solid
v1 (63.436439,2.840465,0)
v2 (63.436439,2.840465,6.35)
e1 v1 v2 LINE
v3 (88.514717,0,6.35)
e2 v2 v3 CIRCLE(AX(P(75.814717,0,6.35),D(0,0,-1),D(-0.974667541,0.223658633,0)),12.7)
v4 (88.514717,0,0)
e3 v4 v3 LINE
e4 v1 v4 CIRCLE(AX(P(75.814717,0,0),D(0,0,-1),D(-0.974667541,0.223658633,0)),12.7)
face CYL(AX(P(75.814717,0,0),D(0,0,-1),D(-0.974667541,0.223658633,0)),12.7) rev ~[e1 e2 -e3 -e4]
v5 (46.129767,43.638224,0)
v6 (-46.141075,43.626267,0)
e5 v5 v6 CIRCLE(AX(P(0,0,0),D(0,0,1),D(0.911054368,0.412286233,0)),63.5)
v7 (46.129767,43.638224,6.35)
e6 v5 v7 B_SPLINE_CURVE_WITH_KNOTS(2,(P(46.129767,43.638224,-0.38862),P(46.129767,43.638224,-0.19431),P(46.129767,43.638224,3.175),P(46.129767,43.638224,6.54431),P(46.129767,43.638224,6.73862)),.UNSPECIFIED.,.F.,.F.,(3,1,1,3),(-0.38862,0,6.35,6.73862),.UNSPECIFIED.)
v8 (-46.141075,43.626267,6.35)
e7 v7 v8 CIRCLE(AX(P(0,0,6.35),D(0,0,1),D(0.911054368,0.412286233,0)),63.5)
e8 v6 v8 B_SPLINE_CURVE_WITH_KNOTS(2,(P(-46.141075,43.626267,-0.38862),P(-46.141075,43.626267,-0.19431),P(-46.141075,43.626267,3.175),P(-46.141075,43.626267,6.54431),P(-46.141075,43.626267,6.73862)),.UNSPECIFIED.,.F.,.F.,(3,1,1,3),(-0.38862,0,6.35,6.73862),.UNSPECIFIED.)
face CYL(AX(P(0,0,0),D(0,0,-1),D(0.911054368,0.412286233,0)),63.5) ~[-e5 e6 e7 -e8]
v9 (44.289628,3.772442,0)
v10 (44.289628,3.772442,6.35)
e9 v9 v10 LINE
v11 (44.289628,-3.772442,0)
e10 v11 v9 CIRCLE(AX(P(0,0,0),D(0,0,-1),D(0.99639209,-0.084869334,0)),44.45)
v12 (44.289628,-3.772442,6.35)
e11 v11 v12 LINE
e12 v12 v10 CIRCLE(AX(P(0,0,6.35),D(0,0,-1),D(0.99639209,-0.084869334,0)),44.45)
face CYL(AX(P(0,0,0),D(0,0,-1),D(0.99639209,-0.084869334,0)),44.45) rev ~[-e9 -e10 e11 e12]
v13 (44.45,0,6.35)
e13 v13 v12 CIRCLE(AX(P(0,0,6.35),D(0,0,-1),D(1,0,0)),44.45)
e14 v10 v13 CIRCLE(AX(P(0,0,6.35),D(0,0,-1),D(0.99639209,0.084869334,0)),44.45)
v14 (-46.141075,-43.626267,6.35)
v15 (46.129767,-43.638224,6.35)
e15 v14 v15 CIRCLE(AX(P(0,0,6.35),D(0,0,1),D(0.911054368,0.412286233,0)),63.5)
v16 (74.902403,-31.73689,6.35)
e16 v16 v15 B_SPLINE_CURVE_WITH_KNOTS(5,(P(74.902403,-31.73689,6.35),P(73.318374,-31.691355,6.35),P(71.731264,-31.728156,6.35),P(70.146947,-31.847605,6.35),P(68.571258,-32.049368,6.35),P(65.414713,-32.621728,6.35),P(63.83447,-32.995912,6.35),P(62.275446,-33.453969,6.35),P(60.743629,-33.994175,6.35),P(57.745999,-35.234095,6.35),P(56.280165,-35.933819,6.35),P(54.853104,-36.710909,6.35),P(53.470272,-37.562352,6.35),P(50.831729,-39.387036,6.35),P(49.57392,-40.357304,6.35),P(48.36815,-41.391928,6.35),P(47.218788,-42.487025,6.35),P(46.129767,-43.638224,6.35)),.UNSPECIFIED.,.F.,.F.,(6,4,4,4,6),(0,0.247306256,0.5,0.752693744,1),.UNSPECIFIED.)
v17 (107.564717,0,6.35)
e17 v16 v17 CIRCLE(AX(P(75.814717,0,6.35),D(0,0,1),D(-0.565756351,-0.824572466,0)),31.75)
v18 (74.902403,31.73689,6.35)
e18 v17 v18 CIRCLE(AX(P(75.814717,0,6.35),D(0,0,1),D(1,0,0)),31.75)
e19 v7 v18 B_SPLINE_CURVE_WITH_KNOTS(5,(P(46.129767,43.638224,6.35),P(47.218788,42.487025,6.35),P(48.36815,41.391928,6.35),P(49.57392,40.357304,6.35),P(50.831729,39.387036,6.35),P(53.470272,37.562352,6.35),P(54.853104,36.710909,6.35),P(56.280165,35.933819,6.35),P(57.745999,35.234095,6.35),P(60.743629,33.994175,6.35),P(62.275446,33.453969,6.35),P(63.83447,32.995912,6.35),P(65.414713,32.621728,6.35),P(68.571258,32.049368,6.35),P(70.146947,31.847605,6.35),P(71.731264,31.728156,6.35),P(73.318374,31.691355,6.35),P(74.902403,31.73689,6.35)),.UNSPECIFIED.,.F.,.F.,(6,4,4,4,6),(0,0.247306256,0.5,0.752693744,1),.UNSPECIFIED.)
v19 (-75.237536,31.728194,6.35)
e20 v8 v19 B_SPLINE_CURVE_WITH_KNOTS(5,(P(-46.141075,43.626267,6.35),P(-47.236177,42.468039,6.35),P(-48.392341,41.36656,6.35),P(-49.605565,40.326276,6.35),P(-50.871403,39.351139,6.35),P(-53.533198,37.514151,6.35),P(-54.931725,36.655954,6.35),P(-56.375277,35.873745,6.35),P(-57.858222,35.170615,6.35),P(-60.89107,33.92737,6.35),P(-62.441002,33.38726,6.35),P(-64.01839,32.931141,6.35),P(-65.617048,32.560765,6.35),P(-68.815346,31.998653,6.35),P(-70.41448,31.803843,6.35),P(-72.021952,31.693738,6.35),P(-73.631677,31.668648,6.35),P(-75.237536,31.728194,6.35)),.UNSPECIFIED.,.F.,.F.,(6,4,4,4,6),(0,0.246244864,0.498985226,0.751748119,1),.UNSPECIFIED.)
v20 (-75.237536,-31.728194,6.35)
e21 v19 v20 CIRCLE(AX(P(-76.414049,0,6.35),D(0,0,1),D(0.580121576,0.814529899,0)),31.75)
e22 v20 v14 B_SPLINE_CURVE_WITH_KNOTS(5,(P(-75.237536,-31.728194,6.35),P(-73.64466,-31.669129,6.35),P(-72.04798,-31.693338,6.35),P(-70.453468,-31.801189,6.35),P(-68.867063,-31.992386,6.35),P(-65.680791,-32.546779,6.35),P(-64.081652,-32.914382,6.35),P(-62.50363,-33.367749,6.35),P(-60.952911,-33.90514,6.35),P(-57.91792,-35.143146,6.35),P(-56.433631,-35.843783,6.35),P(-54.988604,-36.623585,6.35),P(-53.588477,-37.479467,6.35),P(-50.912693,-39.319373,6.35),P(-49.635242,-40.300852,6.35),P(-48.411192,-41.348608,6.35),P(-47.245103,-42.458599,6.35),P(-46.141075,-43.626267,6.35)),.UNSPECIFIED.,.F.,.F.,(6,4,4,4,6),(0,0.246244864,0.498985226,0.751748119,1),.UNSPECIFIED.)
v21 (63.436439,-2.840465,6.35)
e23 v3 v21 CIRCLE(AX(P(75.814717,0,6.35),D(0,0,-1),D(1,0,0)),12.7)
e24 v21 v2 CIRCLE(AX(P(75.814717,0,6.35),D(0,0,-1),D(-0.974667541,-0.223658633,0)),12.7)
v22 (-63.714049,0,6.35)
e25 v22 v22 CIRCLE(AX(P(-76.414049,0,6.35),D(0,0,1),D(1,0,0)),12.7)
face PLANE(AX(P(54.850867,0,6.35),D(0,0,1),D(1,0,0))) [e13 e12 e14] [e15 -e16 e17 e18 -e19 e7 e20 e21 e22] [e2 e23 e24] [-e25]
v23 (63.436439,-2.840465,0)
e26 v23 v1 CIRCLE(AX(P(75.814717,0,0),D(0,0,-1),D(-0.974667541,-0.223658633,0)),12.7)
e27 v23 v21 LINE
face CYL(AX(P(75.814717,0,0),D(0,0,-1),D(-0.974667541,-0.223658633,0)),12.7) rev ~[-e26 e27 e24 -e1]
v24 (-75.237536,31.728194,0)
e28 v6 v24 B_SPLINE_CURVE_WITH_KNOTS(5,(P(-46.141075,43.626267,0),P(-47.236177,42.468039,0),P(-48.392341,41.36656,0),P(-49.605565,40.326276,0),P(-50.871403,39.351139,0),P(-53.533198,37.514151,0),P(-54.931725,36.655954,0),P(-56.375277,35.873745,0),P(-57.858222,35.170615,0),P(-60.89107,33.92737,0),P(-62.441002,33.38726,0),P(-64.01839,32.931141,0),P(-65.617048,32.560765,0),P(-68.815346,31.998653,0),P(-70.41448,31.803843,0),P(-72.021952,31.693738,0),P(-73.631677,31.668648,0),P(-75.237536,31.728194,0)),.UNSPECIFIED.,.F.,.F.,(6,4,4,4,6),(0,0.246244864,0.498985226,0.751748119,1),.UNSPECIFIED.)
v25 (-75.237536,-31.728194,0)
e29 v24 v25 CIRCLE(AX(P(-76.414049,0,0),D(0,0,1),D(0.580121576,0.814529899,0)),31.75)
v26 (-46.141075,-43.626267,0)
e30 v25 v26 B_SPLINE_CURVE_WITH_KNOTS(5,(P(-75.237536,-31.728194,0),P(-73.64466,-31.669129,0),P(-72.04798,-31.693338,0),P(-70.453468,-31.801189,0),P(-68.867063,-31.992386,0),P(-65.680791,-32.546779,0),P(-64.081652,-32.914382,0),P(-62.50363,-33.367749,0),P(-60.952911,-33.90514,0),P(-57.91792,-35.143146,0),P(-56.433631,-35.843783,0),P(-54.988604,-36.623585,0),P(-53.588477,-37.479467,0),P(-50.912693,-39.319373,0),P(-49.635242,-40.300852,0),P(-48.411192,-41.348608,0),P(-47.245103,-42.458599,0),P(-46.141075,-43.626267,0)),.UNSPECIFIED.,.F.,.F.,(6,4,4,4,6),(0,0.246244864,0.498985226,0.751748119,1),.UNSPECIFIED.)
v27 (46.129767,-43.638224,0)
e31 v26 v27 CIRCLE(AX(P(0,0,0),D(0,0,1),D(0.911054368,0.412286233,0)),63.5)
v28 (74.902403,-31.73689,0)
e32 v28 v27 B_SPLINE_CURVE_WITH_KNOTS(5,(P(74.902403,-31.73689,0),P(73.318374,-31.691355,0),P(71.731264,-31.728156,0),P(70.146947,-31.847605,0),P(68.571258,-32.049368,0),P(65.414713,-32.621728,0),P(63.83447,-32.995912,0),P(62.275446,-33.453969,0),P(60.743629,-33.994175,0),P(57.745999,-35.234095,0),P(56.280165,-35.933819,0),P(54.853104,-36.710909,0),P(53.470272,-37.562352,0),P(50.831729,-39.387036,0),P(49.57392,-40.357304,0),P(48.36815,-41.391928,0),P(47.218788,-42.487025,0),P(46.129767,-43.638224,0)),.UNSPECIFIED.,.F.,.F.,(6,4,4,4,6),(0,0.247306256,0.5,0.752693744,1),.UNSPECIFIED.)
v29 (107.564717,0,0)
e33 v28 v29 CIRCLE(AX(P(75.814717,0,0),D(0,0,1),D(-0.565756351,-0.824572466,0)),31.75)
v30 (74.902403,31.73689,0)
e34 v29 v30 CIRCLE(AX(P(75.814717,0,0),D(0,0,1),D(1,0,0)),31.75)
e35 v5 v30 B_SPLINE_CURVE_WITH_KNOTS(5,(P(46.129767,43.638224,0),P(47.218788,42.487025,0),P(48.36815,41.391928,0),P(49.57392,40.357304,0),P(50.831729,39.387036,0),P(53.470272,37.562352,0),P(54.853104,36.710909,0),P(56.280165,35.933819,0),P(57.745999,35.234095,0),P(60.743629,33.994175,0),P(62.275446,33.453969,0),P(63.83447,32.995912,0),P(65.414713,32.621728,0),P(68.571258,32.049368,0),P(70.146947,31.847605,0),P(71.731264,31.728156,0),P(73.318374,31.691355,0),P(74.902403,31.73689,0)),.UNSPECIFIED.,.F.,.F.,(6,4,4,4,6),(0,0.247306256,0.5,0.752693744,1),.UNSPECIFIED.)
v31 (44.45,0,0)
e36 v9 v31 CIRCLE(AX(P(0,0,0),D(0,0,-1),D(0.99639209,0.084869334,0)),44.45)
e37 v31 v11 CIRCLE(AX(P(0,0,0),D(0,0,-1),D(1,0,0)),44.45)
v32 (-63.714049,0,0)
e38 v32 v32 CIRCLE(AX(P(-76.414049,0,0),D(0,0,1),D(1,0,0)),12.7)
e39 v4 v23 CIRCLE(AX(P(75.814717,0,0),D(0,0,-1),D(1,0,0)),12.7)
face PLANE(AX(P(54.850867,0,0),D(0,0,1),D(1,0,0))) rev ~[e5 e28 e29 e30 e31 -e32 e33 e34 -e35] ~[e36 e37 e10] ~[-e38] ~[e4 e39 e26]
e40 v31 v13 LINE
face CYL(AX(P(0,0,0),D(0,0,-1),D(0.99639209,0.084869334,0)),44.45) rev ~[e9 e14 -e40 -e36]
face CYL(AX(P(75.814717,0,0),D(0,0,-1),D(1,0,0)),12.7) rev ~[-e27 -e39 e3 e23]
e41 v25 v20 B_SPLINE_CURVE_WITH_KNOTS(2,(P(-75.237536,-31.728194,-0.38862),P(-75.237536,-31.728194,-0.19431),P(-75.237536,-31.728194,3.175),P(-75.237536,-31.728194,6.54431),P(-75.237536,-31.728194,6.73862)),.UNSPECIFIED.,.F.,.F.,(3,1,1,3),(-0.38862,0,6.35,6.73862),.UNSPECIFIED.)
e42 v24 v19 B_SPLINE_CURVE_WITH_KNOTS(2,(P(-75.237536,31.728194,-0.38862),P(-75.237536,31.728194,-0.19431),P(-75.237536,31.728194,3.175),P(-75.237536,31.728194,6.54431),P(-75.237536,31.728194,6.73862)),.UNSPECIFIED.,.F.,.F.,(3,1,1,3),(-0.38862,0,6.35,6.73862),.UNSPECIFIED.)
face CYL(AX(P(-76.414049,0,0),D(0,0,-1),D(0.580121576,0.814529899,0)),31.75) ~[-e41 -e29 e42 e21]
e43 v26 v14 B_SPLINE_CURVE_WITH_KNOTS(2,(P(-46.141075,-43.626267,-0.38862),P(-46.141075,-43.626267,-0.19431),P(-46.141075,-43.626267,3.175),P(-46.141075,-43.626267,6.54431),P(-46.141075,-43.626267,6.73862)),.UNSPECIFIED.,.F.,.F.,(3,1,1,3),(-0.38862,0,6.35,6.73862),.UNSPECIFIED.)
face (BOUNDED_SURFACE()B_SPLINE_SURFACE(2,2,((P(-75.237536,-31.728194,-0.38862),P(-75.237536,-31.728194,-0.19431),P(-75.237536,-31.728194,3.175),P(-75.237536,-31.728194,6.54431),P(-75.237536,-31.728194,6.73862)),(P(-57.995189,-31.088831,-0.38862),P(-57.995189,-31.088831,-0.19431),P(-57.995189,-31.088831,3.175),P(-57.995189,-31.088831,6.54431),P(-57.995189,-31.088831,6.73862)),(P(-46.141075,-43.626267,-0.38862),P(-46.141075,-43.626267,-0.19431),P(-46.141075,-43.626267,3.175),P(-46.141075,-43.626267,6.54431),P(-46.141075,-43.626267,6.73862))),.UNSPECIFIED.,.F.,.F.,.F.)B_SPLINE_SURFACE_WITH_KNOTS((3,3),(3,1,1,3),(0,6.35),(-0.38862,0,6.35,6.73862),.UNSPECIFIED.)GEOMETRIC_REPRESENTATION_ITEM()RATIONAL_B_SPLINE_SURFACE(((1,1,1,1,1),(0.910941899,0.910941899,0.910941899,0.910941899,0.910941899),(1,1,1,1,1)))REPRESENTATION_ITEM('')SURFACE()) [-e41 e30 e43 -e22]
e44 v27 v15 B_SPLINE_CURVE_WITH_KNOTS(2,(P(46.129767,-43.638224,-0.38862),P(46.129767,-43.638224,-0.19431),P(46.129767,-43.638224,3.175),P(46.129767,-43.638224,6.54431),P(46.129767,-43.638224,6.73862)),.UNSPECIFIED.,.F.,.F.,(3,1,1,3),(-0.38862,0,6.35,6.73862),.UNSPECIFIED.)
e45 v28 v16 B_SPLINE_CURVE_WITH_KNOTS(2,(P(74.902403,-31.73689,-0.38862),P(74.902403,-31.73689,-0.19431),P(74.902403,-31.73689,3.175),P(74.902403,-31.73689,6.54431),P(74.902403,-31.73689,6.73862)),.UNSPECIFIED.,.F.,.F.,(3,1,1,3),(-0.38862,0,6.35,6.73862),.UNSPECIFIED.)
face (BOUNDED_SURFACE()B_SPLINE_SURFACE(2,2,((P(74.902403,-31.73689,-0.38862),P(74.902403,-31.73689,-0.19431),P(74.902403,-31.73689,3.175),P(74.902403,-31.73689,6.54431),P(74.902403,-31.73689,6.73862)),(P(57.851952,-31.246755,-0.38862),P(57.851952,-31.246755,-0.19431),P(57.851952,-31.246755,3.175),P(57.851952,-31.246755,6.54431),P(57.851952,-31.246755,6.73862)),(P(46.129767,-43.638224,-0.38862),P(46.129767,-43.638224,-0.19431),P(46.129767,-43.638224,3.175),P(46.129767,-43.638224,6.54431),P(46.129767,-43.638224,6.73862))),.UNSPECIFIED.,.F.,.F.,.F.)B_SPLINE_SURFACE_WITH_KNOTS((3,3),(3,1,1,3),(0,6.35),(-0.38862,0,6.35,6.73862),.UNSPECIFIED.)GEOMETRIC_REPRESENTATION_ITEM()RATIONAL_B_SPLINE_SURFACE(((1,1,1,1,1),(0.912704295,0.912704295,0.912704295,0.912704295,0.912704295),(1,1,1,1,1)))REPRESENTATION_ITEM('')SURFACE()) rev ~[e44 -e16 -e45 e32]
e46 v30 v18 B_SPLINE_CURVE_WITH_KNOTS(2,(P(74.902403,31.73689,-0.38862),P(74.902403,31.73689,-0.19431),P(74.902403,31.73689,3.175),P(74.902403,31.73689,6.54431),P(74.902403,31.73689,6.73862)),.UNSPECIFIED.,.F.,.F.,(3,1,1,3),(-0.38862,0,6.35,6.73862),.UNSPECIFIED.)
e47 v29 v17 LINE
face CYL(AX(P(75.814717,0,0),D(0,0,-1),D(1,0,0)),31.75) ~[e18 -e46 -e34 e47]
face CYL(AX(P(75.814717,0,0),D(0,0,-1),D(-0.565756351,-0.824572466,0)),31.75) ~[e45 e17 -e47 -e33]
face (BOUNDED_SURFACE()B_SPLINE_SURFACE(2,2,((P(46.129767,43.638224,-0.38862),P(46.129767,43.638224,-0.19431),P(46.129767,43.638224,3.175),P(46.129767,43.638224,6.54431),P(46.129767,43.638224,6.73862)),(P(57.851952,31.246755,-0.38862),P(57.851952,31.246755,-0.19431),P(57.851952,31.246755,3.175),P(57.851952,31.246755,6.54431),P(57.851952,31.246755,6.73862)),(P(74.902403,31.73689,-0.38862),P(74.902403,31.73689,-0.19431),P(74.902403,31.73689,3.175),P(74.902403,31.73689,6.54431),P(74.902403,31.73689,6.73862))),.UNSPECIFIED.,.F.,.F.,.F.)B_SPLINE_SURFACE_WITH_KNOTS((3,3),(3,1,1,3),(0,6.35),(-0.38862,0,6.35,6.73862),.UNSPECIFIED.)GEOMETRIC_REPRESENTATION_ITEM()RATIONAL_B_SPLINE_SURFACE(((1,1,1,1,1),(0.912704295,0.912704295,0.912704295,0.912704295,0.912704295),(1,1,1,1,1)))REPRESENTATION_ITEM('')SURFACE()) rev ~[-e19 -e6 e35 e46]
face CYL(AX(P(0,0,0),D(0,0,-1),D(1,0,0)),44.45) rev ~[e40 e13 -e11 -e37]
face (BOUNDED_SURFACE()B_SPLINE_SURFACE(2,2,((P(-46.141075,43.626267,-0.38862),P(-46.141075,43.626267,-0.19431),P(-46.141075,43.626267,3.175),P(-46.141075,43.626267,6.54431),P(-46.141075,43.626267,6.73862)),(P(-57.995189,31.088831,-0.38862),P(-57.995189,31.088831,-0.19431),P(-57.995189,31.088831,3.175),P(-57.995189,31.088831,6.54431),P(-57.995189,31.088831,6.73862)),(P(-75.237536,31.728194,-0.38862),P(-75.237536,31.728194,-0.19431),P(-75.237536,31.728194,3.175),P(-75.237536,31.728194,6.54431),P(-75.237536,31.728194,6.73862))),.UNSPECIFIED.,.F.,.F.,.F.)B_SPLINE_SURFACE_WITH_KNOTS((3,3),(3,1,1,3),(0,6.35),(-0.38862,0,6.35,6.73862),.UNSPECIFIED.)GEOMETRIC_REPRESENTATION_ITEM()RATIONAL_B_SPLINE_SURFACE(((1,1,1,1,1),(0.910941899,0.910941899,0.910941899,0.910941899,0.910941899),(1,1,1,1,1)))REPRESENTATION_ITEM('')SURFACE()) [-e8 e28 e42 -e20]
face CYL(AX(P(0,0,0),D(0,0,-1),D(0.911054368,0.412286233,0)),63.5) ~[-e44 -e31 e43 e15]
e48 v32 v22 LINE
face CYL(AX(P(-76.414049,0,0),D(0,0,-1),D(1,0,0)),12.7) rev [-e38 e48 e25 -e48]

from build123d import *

# Parameters (mm, degrees)
F0_R     = 12.7
F1_DEPTH = 6.35
F2_R     = 38.1


# Not quite as in the source:
# - a length typed as a fraction of an inch, garbled in the dataset ("3 / 203.2 mm" for 3/8 in), is restored


with BuildPart() as f1:
    # F0 (on Top) → F1 (new body)
    with BuildSketch(Plane.XY):
        with BuildLine():
            ThreePointArc((44.2896283804, 3.7724419046), (44.4098889973, 1.8879245867), (44.45, 0))
            ThreePointArc((44.45, 0), (44.4098889973, -1.8879245867), (44.2896283804, -3.7724419046))
            ThreePointArc((44.2896283804, -3.7724419046), (48.6524538165, -16.4400117074), (57.8519523886, -26.1801757984))
            ThreePointArc((57.8519523886, -26.1801757983), (61.7568132692, -14.7765359551), (63.4364387448, -2.8404646402))
            ThreePointArc((63.4364387448, -2.8404646402), (63.1147165179, 0), (63.4364387448, 2.8404646402))
            ThreePointArc((63.4364387448, 2.8404646402), (61.7568132692, 14.7765359551), (57.8519523886, 26.1801757983))
            ThreePointArc((57.8519523886, 26.1801757984), (48.6524538165, 16.4400117074), (44.2896283804, 3.7724419046))
        make_face()
        with BuildLine():
            ThreePointArc((44.2896283804, -3.7724419046), (-44.45, 0), (44.2896283804, 3.7724419046))
            ThreePointArc((44.2896283804, 3.7724419046), (48.6524538165, 16.4400117074), (57.8519523886, 26.1801757984))
            ThreePointArc((57.8519523886, 26.1801757983), (-0.1747733497, 63.499759482), (-57.9951886366, 25.8613243088))
            ThreePointArc((-57.9951886366, 25.8613243088), (-48.1929456979, 14.5475718573), (-44.6640486717, 0))
            ThreePointArc((-44.6640486717, 0), (-48.1929456979, -14.5475718573), (-57.9951886366, -25.8613243088))
            ThreePointArc((-57.9951886366, -25.8613243088), (-0.1747733497, -63.499759482), (57.8519523886, -26.1801757983))
            ThreePointArc((57.8519523886, -26.1801757984), (48.6524538165, -16.4400117074), (44.2896283804, -3.7724419046))
        make_face()
        with BuildLine():
            ThreePointArc((107.5647165179, 0), (90.6090522396, 28.09252802), (57.8519523886, 26.1801757984))
            ThreePointArc((57.8519523886, 26.1801757983), (61.7568132692, 14.7765359551), (63.4364387448, 2.8404646402))
            ThreePointArc((63.4364387448, 2.8404646402), (77.244029689, 12.6193131294), (88.5147165179, 0))
            ThreePointArc((88.5147165179, 0), (77.244029689, -12.6193131294), (63.4364387448, -2.8404646402))
            ThreePointArc((63.4364387448, -2.8404646402), (61.7568132692, -14.7765359551), (57.8519523886, -26.1801757983))
            ThreePointArc((57.8519523886, -26.1801757984), (90.6090522396, -28.09252802), (107.5647165179, 0))
        make_face()
        with BuildLine():
            ThreePointArc((-44.6640486717, 0), (-48.1929456979, 14.5475718573), (-57.9951886366, 25.8613243088))
            ThreePointArc((-57.9951886366, 25.8613243088), (-63.5, 0), (-57.9951886366, -25.8613243088))
            ThreePointArc((-57.9951886366, -25.8613243088), (-48.1929456979, -14.5475718573), (-44.6640486717, 0))
        make_face()
        with BuildLine():
            ThreePointArc((-57.9951886366, -25.8613243088), (-63.5, 0), (-57.9951886366, 25.8613243088))
            ThreePointArc((-57.9951886366, 25.8613243088), (-108.1640486717, 0), (-57.9951886366, -25.8613243088))
        make_face()
        with Locations((-76.4140486717, 0)):
            Circle(F0_R, mode=Mode.SUBTRACT)
    extrude(amount=F1_DEPTH)

    # F2
    f2_edges = [f1.edges().sort_by_distance(p)[0] for p in [
        (-57.995189, 25.861324, 3.175),
        (57.851952, 26.180176, 3.175),
        (-57.995189, -25.861324, 3.175),
        (57.851952, -26.180176, 3.175),
    ]]
    fillet(f2_edges, radius=F2_R)


solid = f1.part
